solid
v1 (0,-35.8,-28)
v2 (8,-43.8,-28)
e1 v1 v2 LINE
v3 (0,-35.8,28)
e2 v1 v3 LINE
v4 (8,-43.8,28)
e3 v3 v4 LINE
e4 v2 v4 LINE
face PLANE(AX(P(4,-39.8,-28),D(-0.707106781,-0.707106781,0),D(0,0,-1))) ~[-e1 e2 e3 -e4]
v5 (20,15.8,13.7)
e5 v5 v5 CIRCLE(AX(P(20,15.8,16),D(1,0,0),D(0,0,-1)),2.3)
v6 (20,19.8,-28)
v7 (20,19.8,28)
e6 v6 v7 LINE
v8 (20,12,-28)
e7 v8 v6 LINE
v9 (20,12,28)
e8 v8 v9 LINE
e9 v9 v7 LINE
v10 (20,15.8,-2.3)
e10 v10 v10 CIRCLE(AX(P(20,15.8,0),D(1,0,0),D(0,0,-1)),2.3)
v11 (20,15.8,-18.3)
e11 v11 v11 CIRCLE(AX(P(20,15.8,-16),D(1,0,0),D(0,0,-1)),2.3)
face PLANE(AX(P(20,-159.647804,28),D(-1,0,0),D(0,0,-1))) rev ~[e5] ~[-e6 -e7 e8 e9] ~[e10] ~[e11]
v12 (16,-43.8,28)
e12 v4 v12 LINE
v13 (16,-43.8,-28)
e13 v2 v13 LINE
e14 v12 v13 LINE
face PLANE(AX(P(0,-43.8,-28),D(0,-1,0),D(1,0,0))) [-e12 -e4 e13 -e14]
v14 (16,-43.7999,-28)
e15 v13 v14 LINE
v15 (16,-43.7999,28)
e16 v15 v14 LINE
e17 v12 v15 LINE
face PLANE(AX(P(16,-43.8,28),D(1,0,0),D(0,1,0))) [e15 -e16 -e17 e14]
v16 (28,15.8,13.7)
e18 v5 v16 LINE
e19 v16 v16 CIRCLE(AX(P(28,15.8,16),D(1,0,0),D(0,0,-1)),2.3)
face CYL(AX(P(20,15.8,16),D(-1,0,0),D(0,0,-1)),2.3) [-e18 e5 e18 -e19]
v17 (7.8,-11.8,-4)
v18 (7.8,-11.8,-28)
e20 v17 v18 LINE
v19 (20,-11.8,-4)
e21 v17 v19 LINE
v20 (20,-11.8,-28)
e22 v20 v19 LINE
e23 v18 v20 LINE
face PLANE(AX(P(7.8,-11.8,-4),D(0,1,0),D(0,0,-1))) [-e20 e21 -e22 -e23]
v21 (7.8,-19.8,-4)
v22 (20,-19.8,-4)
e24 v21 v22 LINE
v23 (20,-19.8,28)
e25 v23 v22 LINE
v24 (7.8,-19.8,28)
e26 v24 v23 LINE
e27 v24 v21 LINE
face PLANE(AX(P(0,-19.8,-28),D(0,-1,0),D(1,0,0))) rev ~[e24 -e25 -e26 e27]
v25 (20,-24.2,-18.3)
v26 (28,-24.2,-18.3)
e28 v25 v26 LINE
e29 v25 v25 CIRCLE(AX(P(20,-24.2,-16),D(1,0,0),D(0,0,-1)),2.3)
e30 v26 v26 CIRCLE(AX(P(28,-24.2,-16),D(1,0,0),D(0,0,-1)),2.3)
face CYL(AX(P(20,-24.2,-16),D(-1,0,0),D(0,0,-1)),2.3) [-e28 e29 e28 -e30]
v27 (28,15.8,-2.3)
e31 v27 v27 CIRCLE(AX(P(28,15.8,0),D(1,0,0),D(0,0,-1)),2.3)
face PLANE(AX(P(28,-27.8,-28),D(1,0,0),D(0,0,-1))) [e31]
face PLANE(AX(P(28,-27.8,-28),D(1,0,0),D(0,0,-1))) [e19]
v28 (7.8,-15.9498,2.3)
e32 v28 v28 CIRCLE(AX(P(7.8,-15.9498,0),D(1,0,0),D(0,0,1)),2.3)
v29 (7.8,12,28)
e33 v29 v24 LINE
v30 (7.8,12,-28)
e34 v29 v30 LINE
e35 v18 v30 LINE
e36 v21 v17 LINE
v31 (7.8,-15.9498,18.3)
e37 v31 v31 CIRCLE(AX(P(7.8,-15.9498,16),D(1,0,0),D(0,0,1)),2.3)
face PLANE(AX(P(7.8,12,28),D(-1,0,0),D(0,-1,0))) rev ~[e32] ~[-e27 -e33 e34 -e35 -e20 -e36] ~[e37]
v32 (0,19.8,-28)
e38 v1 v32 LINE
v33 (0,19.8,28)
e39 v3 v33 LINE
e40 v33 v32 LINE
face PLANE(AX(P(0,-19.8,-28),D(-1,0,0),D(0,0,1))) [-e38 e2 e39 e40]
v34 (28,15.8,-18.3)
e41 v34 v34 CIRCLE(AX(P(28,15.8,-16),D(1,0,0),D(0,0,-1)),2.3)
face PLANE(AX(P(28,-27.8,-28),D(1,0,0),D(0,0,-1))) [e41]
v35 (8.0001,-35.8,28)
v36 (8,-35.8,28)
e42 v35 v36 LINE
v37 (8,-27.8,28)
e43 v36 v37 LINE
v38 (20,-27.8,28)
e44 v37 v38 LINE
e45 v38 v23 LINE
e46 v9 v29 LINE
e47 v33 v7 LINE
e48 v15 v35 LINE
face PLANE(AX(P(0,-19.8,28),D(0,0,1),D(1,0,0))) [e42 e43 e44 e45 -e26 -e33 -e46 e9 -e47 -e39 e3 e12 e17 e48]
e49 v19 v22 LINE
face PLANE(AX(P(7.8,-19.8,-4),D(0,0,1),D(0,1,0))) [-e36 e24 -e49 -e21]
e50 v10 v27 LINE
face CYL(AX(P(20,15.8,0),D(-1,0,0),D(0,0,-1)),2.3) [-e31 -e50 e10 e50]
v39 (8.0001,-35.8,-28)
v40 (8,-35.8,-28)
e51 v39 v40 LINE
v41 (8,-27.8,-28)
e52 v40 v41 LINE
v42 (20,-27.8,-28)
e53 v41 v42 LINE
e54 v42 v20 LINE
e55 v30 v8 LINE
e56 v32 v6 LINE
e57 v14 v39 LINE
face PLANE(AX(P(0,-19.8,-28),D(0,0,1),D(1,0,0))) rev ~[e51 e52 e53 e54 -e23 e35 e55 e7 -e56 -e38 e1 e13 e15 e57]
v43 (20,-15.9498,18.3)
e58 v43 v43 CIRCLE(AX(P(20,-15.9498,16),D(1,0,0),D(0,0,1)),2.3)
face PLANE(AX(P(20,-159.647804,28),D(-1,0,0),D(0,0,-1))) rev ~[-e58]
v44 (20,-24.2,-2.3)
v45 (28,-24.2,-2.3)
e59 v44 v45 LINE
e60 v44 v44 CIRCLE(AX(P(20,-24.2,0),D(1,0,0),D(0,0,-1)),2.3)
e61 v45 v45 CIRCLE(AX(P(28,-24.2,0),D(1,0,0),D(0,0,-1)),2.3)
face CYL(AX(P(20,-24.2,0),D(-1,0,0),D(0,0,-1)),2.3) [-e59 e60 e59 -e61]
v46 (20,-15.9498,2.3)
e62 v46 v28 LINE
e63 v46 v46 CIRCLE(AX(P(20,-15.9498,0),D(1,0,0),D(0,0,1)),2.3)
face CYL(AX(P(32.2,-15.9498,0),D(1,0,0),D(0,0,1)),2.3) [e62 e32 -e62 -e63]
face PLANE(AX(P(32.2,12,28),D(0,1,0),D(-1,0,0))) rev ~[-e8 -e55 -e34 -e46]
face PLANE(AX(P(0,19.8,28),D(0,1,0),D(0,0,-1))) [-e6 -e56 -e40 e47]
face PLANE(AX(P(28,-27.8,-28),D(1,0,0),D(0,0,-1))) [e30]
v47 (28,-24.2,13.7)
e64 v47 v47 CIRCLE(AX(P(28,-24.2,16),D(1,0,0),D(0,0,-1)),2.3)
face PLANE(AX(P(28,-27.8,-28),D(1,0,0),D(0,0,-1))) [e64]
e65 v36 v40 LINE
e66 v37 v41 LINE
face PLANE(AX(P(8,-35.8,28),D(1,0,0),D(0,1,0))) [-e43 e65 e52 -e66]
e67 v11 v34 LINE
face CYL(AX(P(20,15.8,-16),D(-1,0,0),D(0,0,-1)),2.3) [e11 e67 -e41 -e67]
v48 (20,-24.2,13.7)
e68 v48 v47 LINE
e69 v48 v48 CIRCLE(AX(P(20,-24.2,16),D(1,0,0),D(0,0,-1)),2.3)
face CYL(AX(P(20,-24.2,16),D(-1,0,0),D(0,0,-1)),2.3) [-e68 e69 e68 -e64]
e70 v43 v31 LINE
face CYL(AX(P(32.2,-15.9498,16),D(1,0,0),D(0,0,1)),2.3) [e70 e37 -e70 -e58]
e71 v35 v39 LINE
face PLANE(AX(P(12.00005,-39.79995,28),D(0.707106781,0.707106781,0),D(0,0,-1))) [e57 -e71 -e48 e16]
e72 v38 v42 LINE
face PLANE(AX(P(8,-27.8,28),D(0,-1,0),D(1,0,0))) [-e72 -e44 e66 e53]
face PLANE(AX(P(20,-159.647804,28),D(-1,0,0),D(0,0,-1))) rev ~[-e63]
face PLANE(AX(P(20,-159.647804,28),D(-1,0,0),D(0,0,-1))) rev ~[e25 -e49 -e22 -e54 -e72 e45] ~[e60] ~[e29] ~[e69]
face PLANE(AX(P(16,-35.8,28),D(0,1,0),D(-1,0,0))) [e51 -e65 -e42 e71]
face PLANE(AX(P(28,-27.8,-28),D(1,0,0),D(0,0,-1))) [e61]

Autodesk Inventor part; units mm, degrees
ref_plane "YZ Plane" through (0, 0, 0) normal (1, 0, 0) x (0, 1, 0)
ref_plane "XZ Plane" through (0, 0, 0) normal (0, 1, 0) x (-1, 0, 0)
ref_plane "XY Plane" through (0, 0, 0) normal (0, 0, 1) x (1, 0, 0)
sketch "Sketch1" plane through (0, 0, 0) normal (1, 0, 0) x (0, 1, 0)
  line L0 (-19.8, 28) -> (19.8, 28)
  line L1 (19.8, 28) -> (19.8, -28)
  line L2 (19.8, -28) -> (-19.8, -28)
  line L3 (-19.8, -28) -> (-19.8, 28)
  line L4 (-19.8, 28) -> (19.8, -28) construction
  line L5 (19.8, 28) -> (-19.8, -28) construction
  point P0 (0, 0)
  dimension "d0" = 39.6
  dimension "d1" = 56
extrude "Extrusion1" add sketch "Sketch1" along normal blind 40
sketch "Sketch2" plane through (0, -19.8, 28) normal (0, 0, 1) x (1, 0, 0)
  line L0 (7.8, 0) -> (32.2, 0)
  line L1 (32.2, 0) -> (32.2, 31.8)
  line L2 (32.2, 31.8) -> (7.8, 31.8)
  line L3 (7.8, 31.8) -> (7.8, 0)
  line L4 (0, 0) -> (40, 0) projected
  line L5 (40, 39.6) -> (40, 0) projected
  dimension "d4" = 24.4
  dimension "d5" = 31.8
  dimension "d6" = 7.8
extrude "Extrusion2" cut sketch "Sketch2" against normal blind 64
sketch "Sketch3" plane through (32.2, -19.8, 28) normal (-1, 0, 0) x (0, 0, 1)
  circle A0 centre (-12, 3.8502) radius 2.3
  circle A1 centre (-28, 3.8502) radius 2.3
  line L0 (0, 31.8) -> (0, 0) projected
  point P0 (-28, 19.8)
  dimension "d9" = 4.6
  dimension "d10" = 4.6
  dimension "d11" = 16
  dimension "d12" = 12
extrude "Extrusion3" add sketch "Sketch3" along normal blind 26
sketch "Sketch4" plane through (7.8, -19.8, 28) normal (1, 0, 0) x (0, 0, -1)
  line L0 (56, 0) -> (0, 0) projected
  line L1 (56, 0) -> (32, 0)
  line L2 (32, 0) -> (32, 8)
  line L3 (32, 8) -> (56, 8)
  line L4 (56, 8) -> (56, 0)
  point P0 (28, 19.8)
  point P1 (32, 0)
  dimension "d15" = 24
  dimension "d16" = 8
extrude "Extrusion4" add sketch "Sketch4" along normal blind 26
sketch "Sketch14" plane through (0, 19.8, 28) normal (0, 1, 0) x (1, 0, 0)
  line L0 (20, 0) -> (20, 56) projected
  point P0 (0, 28)
sketch "Sketch15" plane through (0, -19.8, -28) normal (0, -1, 0) x (1, 0, 0)
  line L0 (40, 0) -> (40, 56) projected
  line L1 (0, 0) -> (40, 0) projected
  line L2 (0, 56) -> (40, 56) projected
  line L3 (0, 0) -> (0, 56) projected
  point P0 (0, 28)
extrude "Extrusion7" add sketch "Sketch15" along normal blind 24
sketch "Sketch16" plane through (0, 19.8, 28) normal (0, 0, 1) x (1, 0, 0)
  line L0 (8, -47.6) -> (32, -47.6)
  line L1 (32, -47.6) -> (32, -55.6)
  line L2 (32, -55.6) -> (8, -55.6)
  line L3 (8, -55.6) -> (8, -47.6)
  line L4 (40, -63.6) -> (0, -63.6) projected
  line L5 (0, 0) -> (0, -63.6) projected
  line L6 (16, -55.6) -> (24, -55.6)
  line L7 (24, -55.6) -> (24, -63.6)
  line L8 (24, -63.6) -> (16, -63.6)
  line L9 (16, -63.6) -> (16, -55.6)
  point P0 (0, -19.8)
  dimension "d37" = 24
  dimension "d38" = 8
  dimension "d39" = 8
  dimension "d40" = 8
  dimension "d41" = 8
  dimension "d42" = 8
  dimension "d43" = 16
extrude "Extrusion8" cut sketch "Sketch16" against normal through all
chamfer "Chamfer1" distance 8 angle 45 2 edges at (40, -43.8, 0) (0, -43.8, 0)
chamfer "Chamfer2" distance 8 angle 45 2 edges at (16, -35.8, 0) (24, -35.8, 0)
split body "Split1" sketch "Sketch14" result one side removed curves L0 removed pieces at (39.5, -17.2667, 9.3333)
sketch "Sketch17" plane through (20, -27.8, -28) normal (1, 0, 0) x (0, 0, -1)
  circle A0 centre (-44, 43.6) radius 2.3
  circle A1 centre (-28, 43.6) radius 2.3
  circle A2 centre (-12, 43.6) radius 2.3
  circle A3 centre (-44, 3.6) radius 2.3
  circle A4 centre (-28, 3.6) radius 2.3
  circle A5 centre (-12, 3.6) radius 2.3
  line L0 (-56, 39.8) -> (-56, 47.6) projected
  line L1 (-56, 47.6) -> (0, 47.6) projected
  point P0 (-28, 27.8)
  dimension "d52" = 4.6
  dimension "d53" = 4.6
  dimension "d54" = 4.6
  dimension "d55" = 4.6
  dimension "d56" = 4.6
  dimension "d57" = 4.6
  dimension "d58" = 12
  dimension "d59" = 16
  dimension "d60" = 16
  dimension "d61" = 4
  dimension "d62" = 40
extrude "Extrusion9" add sketch "Sketch17" along normal blind 8
properties part number "MotorHolder_X_L"
